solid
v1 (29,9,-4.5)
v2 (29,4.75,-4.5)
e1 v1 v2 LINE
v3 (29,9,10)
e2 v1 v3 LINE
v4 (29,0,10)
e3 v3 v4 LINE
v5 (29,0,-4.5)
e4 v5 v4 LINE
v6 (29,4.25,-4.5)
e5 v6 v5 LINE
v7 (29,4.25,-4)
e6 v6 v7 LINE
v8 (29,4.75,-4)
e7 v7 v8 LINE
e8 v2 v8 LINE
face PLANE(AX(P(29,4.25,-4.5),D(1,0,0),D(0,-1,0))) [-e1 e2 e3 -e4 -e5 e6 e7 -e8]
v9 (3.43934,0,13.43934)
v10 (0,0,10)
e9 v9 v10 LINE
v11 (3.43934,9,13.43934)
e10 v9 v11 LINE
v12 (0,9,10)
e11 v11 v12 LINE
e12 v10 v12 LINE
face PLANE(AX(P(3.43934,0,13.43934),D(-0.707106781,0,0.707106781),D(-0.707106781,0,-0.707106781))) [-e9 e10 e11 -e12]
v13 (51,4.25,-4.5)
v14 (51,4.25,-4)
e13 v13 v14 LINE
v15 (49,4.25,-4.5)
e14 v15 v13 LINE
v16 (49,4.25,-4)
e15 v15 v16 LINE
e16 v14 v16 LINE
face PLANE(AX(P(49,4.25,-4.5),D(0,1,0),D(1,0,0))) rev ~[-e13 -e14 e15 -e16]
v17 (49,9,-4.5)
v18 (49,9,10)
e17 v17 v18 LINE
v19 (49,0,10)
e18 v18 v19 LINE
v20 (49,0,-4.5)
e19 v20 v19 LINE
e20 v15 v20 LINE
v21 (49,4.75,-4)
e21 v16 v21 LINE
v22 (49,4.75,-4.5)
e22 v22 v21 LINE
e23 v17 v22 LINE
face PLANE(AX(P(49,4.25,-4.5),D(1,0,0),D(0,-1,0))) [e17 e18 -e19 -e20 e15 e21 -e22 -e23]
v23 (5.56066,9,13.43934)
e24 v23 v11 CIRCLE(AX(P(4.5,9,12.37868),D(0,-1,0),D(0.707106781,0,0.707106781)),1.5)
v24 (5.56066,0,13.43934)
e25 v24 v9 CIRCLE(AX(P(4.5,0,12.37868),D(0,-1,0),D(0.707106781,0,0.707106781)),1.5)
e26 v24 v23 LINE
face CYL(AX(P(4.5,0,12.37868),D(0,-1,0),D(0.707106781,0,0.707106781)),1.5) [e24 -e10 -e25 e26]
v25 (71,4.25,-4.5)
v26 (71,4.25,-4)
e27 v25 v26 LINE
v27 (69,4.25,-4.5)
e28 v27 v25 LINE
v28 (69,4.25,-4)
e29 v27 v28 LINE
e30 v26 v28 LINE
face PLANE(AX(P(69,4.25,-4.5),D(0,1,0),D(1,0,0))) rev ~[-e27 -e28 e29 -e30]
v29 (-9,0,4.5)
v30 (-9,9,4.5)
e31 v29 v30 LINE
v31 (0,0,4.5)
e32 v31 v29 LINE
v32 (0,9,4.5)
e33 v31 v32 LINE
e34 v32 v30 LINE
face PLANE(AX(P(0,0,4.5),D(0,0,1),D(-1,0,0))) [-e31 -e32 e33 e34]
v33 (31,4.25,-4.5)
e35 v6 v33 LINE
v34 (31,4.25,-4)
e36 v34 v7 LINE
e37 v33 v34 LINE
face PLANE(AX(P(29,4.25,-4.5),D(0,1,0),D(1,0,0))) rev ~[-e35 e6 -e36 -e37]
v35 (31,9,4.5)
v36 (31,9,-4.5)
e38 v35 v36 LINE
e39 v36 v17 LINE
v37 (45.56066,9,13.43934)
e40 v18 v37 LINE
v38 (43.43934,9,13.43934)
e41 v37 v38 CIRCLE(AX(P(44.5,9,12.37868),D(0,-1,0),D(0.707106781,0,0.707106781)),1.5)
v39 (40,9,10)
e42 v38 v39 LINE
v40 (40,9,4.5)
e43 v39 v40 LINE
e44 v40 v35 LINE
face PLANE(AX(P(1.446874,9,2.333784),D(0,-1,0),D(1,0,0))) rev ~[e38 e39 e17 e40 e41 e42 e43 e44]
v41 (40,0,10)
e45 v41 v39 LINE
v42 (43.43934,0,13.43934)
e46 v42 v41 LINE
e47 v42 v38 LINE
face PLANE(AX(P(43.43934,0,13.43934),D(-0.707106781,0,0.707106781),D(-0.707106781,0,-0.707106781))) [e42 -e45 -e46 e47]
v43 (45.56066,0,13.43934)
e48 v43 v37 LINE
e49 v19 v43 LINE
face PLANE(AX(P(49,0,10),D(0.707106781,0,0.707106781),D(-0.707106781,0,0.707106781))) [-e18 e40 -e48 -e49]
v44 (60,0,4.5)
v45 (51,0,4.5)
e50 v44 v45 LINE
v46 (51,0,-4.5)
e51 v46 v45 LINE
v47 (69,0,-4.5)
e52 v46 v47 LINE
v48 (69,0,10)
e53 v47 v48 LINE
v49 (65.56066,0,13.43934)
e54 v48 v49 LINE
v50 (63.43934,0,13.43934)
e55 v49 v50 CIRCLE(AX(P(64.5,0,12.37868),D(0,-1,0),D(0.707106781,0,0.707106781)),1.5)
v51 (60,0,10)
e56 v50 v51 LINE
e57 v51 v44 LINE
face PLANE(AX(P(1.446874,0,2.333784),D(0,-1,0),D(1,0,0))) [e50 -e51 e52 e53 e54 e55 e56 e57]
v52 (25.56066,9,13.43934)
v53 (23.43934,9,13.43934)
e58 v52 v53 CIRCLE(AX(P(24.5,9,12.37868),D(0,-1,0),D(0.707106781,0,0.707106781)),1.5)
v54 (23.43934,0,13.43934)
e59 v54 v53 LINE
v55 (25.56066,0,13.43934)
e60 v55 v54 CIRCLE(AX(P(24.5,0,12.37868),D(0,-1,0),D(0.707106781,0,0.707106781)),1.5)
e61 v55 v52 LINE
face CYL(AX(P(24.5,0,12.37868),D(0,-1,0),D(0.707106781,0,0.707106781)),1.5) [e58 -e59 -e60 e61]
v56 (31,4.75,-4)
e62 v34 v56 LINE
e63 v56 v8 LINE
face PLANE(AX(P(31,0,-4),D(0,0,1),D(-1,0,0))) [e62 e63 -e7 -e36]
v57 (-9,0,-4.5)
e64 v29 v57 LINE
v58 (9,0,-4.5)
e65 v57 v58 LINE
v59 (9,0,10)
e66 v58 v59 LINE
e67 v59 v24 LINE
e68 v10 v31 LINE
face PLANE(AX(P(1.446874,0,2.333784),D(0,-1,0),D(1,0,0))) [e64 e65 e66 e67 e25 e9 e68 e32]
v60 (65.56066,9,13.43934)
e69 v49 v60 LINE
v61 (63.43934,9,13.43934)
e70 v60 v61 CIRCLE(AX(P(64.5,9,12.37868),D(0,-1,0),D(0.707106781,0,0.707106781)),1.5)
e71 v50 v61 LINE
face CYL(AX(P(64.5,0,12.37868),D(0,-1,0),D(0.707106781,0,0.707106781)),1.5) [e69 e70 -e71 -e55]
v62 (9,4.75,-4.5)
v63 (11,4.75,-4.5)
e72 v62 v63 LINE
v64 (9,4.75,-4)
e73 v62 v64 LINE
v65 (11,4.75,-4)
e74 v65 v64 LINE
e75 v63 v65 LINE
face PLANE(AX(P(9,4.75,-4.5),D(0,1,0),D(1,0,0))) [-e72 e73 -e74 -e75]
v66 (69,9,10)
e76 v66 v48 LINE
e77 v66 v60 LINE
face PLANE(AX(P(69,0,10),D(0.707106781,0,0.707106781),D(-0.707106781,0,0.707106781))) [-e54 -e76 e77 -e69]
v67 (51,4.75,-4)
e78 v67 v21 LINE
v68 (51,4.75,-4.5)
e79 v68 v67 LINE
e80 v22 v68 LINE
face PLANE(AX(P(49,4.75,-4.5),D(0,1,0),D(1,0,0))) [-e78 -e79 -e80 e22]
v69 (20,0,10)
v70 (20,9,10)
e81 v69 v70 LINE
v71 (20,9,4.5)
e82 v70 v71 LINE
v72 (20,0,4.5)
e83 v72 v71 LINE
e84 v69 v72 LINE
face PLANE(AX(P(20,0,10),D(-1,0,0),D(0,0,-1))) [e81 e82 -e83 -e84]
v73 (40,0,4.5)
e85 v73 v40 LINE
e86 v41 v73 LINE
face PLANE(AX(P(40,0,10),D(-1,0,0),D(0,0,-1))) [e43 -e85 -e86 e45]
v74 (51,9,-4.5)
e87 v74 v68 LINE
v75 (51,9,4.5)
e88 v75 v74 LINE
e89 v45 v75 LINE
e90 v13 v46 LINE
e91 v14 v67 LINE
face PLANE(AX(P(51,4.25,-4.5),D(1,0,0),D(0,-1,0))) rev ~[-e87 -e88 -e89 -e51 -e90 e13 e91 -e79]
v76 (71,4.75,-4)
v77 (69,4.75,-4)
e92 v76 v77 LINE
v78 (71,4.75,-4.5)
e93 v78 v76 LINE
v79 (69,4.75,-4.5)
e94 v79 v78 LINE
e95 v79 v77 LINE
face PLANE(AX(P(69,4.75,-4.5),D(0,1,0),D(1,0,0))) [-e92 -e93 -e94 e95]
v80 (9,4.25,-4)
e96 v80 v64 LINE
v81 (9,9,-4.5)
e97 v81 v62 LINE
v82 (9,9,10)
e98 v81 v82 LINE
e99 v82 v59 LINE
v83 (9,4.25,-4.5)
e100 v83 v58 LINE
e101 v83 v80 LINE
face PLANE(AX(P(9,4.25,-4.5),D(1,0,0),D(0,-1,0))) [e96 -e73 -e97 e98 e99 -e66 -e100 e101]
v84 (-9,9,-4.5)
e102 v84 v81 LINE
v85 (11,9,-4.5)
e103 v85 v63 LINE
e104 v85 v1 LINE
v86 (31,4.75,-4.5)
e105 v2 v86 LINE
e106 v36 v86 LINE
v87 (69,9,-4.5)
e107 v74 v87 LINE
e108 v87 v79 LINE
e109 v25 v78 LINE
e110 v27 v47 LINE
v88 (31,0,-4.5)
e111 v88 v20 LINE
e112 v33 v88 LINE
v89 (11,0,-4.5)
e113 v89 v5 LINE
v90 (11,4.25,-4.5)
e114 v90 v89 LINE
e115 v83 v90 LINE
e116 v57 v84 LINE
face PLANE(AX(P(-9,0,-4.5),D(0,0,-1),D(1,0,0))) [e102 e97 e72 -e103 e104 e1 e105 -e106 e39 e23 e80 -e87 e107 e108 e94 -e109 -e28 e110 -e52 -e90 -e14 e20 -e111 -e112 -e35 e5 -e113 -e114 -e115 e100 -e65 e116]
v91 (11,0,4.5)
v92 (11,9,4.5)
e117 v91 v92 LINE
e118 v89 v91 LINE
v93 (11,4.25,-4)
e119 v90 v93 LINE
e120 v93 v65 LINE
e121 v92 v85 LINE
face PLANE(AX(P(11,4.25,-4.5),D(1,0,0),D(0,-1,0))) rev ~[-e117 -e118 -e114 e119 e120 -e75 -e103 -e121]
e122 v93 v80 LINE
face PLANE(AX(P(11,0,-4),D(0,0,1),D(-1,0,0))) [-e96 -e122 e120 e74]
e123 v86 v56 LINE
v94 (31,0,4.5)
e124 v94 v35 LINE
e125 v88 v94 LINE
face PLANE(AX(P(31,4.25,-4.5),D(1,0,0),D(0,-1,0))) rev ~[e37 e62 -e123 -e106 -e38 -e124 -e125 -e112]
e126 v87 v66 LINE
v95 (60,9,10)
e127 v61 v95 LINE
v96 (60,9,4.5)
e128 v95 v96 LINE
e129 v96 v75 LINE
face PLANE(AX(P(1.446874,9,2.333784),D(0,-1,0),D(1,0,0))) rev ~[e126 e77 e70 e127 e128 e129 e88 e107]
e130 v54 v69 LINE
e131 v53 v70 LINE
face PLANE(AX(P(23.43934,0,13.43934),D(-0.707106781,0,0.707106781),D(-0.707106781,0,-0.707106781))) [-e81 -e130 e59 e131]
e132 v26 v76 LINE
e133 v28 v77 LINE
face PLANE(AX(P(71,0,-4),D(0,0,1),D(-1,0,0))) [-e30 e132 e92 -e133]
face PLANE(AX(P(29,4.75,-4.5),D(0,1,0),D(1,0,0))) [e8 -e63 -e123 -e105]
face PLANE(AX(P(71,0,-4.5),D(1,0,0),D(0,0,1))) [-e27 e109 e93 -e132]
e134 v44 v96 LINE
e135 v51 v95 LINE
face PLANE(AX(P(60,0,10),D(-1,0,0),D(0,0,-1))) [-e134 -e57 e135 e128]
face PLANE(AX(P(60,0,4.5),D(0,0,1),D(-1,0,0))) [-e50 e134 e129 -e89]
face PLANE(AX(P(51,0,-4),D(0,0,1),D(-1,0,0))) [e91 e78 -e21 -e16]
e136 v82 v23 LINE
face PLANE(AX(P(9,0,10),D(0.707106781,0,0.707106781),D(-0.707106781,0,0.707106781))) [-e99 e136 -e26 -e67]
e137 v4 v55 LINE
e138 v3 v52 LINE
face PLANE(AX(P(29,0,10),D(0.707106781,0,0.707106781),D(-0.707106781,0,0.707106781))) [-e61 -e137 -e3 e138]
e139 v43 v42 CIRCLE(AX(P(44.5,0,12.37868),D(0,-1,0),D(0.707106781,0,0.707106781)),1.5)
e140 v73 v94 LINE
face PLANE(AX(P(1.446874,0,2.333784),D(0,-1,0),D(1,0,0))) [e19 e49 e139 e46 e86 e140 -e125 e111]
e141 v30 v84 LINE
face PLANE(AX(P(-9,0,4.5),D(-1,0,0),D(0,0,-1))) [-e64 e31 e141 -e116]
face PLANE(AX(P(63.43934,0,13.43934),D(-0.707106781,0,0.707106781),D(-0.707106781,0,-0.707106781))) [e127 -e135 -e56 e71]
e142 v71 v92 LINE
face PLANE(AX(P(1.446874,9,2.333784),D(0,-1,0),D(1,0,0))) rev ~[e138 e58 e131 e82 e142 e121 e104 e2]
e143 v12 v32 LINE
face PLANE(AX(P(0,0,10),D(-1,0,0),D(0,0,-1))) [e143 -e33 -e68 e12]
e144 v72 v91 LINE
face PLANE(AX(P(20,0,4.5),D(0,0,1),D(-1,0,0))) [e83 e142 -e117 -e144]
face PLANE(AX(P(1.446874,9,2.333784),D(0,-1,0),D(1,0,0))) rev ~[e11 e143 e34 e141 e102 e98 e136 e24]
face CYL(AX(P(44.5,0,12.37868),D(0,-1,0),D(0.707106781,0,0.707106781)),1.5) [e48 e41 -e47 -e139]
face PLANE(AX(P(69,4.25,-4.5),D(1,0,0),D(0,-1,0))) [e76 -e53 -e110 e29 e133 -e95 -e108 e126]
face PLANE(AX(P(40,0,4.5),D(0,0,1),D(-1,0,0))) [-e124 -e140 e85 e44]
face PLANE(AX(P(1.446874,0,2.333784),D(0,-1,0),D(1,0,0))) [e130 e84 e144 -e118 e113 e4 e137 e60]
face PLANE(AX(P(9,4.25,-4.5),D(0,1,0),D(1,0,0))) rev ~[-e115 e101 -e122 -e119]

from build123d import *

# Parameters (mm, degrees)
F1_DEPTH = 9
F2_W     = 2
F2_H     = 4.25
F3_DEPTH = 18.3796796564


# Not quite as in the source:
# - a feature names something its author has since deleted; it is built from what else it names


with BuildPart() as f1:
    # F0 (on Front) → F1 (new body)
    with BuildSketch(Plane.XZ):
        with BuildLine():
            Line((-9, -4.5), (9, -4.5))
            Line((9, -4.5), (11, -4.5))
            Line((11, -4.5), (11, -4))
            Line((11, -4), (9, -4))
            Line((9, -4), (9, 4.5))
            Line((9, 4.5), (9, 10))
            Line((9, 10), (5.5606601718, 13.4393398282))
            ThreePointArc((5.5606601718, 13.4393398282), (4.5, 13.8786796564), (3.4393398282, 13.4393398282))
            Line((3.4393398282, 13.4393398282), (0, 10))
            Line((0, 10), (0, 4.5))
            Line((0, 4.5), (-9, 4.5))
            Line((-9, 4.5), (-9, -4.5))
        make_face()
        with BuildLine():
            Line((11, -4), (11, -4.5))
            Line((11, -4.5), (29, -4.5))
            Line((29, -4.5), (31, -4.5))
            Line((31, -4.5), (31, -4))
            Line((31, -4), (29, -4))
            Line((29, -4), (29, 4.5))
            Line((29, 4.5), (29, 10))
            Line((29, 10), (25.5606601718, 13.4393398282))
            ThreePointArc((25.5606601718, 13.4393398282), (24.5, 13.8786796564), (23.4393398282, 13.4393398282))
            Line((23.4393398282, 13.4393398282), (20, 10))
            Line((20, 10), (20, 4.5))
            Line((20, 4.5), (11, 4.5))
            Line((11, 4.5), (11, -4))
        make_face()
        with BuildLine():
            Line((31, -4), (31, -4.5))
            Line((31, -4.5), (49, -4.5))
            Line((49, -4.5), (51, -4.5))
            Line((51, -4.5), (51, -4))
            Line((51, -4), (49, -4))
            Line((49, -4), (49, 4.5))
            Line((49, 4.5), (49, 10))
            Line((49, 10), (45.5606601718, 13.4393398282))
            ThreePointArc((45.5606601718, 13.4393398282), (44.5, 13.8786796564), (43.4393398282, 13.4393398282))
            Line((43.4393398282, 13.4393398282), (40, 10))
            Line((40, 10), (40, 4.5))
            Line((40, 4.5), (31, 4.5))
            Line((31, 4.5), (31, -4))
        make_face()
        with BuildLine():
            Line((51, -4), (51, -4.5))
            Line((51, -4.5), (69, -4.5))
            Line((69, -4.5), (71, -4.5))
            Line((71, -4.5), (71, -4))
            Line((71, -4), (69, -4))
            Line((69, -4), (69, 4.5))
            Line((69, 4.5), (69, 10))
            Line((69, 10), (65.5606601718, 13.4393398282))
            ThreePointArc((65.5606601718, 13.4393398282), (64.5, 13.8786796564), (63.4393398282, 13.4393398282))
            Line((63.4393398282, 13.4393398282), (60, 10))
            Line((60, 10), (60, 4.5))
            Line((60, 4.5), (51, 4.5))
            Line((51, 4.5), (51, -4))
        make_face()
    extrude(amount=-F1_DEPTH)

    # F2 (on face) → F3 (cut, through all)
    with BuildSketch(Plane(origin=(0, 0, -4.5), x_dir=(1, 0, 0), z_dir=(0, 0, -1))):
        with Locations((10, -2.125)):
            Rectangle(F2_W, F2_H)
        with Locations((10, -6.875)):
            Rectangle(F2_W, F2_H)
        with Locations((30, -2.125)):
            Rectangle(F2_W, F2_H)
        with Locations((30, -6.875)):
            Rectangle(F2_W, F2_H)
        with Locations((50, -2.125)):
            Rectangle(F2_W, F2_H)
        with Locations((50, -6.875)):
            Rectangle(F2_W, F2_H)
        with Locations((70, -2.125)):
            Rectangle(F2_W, F2_H)
        with Locations((70, -6.875)):
            Rectangle(F2_W, F2_H)
    extrude(amount=-F3_DEPTH, mode=Mode.SUBTRACT)


solid = f1.part
